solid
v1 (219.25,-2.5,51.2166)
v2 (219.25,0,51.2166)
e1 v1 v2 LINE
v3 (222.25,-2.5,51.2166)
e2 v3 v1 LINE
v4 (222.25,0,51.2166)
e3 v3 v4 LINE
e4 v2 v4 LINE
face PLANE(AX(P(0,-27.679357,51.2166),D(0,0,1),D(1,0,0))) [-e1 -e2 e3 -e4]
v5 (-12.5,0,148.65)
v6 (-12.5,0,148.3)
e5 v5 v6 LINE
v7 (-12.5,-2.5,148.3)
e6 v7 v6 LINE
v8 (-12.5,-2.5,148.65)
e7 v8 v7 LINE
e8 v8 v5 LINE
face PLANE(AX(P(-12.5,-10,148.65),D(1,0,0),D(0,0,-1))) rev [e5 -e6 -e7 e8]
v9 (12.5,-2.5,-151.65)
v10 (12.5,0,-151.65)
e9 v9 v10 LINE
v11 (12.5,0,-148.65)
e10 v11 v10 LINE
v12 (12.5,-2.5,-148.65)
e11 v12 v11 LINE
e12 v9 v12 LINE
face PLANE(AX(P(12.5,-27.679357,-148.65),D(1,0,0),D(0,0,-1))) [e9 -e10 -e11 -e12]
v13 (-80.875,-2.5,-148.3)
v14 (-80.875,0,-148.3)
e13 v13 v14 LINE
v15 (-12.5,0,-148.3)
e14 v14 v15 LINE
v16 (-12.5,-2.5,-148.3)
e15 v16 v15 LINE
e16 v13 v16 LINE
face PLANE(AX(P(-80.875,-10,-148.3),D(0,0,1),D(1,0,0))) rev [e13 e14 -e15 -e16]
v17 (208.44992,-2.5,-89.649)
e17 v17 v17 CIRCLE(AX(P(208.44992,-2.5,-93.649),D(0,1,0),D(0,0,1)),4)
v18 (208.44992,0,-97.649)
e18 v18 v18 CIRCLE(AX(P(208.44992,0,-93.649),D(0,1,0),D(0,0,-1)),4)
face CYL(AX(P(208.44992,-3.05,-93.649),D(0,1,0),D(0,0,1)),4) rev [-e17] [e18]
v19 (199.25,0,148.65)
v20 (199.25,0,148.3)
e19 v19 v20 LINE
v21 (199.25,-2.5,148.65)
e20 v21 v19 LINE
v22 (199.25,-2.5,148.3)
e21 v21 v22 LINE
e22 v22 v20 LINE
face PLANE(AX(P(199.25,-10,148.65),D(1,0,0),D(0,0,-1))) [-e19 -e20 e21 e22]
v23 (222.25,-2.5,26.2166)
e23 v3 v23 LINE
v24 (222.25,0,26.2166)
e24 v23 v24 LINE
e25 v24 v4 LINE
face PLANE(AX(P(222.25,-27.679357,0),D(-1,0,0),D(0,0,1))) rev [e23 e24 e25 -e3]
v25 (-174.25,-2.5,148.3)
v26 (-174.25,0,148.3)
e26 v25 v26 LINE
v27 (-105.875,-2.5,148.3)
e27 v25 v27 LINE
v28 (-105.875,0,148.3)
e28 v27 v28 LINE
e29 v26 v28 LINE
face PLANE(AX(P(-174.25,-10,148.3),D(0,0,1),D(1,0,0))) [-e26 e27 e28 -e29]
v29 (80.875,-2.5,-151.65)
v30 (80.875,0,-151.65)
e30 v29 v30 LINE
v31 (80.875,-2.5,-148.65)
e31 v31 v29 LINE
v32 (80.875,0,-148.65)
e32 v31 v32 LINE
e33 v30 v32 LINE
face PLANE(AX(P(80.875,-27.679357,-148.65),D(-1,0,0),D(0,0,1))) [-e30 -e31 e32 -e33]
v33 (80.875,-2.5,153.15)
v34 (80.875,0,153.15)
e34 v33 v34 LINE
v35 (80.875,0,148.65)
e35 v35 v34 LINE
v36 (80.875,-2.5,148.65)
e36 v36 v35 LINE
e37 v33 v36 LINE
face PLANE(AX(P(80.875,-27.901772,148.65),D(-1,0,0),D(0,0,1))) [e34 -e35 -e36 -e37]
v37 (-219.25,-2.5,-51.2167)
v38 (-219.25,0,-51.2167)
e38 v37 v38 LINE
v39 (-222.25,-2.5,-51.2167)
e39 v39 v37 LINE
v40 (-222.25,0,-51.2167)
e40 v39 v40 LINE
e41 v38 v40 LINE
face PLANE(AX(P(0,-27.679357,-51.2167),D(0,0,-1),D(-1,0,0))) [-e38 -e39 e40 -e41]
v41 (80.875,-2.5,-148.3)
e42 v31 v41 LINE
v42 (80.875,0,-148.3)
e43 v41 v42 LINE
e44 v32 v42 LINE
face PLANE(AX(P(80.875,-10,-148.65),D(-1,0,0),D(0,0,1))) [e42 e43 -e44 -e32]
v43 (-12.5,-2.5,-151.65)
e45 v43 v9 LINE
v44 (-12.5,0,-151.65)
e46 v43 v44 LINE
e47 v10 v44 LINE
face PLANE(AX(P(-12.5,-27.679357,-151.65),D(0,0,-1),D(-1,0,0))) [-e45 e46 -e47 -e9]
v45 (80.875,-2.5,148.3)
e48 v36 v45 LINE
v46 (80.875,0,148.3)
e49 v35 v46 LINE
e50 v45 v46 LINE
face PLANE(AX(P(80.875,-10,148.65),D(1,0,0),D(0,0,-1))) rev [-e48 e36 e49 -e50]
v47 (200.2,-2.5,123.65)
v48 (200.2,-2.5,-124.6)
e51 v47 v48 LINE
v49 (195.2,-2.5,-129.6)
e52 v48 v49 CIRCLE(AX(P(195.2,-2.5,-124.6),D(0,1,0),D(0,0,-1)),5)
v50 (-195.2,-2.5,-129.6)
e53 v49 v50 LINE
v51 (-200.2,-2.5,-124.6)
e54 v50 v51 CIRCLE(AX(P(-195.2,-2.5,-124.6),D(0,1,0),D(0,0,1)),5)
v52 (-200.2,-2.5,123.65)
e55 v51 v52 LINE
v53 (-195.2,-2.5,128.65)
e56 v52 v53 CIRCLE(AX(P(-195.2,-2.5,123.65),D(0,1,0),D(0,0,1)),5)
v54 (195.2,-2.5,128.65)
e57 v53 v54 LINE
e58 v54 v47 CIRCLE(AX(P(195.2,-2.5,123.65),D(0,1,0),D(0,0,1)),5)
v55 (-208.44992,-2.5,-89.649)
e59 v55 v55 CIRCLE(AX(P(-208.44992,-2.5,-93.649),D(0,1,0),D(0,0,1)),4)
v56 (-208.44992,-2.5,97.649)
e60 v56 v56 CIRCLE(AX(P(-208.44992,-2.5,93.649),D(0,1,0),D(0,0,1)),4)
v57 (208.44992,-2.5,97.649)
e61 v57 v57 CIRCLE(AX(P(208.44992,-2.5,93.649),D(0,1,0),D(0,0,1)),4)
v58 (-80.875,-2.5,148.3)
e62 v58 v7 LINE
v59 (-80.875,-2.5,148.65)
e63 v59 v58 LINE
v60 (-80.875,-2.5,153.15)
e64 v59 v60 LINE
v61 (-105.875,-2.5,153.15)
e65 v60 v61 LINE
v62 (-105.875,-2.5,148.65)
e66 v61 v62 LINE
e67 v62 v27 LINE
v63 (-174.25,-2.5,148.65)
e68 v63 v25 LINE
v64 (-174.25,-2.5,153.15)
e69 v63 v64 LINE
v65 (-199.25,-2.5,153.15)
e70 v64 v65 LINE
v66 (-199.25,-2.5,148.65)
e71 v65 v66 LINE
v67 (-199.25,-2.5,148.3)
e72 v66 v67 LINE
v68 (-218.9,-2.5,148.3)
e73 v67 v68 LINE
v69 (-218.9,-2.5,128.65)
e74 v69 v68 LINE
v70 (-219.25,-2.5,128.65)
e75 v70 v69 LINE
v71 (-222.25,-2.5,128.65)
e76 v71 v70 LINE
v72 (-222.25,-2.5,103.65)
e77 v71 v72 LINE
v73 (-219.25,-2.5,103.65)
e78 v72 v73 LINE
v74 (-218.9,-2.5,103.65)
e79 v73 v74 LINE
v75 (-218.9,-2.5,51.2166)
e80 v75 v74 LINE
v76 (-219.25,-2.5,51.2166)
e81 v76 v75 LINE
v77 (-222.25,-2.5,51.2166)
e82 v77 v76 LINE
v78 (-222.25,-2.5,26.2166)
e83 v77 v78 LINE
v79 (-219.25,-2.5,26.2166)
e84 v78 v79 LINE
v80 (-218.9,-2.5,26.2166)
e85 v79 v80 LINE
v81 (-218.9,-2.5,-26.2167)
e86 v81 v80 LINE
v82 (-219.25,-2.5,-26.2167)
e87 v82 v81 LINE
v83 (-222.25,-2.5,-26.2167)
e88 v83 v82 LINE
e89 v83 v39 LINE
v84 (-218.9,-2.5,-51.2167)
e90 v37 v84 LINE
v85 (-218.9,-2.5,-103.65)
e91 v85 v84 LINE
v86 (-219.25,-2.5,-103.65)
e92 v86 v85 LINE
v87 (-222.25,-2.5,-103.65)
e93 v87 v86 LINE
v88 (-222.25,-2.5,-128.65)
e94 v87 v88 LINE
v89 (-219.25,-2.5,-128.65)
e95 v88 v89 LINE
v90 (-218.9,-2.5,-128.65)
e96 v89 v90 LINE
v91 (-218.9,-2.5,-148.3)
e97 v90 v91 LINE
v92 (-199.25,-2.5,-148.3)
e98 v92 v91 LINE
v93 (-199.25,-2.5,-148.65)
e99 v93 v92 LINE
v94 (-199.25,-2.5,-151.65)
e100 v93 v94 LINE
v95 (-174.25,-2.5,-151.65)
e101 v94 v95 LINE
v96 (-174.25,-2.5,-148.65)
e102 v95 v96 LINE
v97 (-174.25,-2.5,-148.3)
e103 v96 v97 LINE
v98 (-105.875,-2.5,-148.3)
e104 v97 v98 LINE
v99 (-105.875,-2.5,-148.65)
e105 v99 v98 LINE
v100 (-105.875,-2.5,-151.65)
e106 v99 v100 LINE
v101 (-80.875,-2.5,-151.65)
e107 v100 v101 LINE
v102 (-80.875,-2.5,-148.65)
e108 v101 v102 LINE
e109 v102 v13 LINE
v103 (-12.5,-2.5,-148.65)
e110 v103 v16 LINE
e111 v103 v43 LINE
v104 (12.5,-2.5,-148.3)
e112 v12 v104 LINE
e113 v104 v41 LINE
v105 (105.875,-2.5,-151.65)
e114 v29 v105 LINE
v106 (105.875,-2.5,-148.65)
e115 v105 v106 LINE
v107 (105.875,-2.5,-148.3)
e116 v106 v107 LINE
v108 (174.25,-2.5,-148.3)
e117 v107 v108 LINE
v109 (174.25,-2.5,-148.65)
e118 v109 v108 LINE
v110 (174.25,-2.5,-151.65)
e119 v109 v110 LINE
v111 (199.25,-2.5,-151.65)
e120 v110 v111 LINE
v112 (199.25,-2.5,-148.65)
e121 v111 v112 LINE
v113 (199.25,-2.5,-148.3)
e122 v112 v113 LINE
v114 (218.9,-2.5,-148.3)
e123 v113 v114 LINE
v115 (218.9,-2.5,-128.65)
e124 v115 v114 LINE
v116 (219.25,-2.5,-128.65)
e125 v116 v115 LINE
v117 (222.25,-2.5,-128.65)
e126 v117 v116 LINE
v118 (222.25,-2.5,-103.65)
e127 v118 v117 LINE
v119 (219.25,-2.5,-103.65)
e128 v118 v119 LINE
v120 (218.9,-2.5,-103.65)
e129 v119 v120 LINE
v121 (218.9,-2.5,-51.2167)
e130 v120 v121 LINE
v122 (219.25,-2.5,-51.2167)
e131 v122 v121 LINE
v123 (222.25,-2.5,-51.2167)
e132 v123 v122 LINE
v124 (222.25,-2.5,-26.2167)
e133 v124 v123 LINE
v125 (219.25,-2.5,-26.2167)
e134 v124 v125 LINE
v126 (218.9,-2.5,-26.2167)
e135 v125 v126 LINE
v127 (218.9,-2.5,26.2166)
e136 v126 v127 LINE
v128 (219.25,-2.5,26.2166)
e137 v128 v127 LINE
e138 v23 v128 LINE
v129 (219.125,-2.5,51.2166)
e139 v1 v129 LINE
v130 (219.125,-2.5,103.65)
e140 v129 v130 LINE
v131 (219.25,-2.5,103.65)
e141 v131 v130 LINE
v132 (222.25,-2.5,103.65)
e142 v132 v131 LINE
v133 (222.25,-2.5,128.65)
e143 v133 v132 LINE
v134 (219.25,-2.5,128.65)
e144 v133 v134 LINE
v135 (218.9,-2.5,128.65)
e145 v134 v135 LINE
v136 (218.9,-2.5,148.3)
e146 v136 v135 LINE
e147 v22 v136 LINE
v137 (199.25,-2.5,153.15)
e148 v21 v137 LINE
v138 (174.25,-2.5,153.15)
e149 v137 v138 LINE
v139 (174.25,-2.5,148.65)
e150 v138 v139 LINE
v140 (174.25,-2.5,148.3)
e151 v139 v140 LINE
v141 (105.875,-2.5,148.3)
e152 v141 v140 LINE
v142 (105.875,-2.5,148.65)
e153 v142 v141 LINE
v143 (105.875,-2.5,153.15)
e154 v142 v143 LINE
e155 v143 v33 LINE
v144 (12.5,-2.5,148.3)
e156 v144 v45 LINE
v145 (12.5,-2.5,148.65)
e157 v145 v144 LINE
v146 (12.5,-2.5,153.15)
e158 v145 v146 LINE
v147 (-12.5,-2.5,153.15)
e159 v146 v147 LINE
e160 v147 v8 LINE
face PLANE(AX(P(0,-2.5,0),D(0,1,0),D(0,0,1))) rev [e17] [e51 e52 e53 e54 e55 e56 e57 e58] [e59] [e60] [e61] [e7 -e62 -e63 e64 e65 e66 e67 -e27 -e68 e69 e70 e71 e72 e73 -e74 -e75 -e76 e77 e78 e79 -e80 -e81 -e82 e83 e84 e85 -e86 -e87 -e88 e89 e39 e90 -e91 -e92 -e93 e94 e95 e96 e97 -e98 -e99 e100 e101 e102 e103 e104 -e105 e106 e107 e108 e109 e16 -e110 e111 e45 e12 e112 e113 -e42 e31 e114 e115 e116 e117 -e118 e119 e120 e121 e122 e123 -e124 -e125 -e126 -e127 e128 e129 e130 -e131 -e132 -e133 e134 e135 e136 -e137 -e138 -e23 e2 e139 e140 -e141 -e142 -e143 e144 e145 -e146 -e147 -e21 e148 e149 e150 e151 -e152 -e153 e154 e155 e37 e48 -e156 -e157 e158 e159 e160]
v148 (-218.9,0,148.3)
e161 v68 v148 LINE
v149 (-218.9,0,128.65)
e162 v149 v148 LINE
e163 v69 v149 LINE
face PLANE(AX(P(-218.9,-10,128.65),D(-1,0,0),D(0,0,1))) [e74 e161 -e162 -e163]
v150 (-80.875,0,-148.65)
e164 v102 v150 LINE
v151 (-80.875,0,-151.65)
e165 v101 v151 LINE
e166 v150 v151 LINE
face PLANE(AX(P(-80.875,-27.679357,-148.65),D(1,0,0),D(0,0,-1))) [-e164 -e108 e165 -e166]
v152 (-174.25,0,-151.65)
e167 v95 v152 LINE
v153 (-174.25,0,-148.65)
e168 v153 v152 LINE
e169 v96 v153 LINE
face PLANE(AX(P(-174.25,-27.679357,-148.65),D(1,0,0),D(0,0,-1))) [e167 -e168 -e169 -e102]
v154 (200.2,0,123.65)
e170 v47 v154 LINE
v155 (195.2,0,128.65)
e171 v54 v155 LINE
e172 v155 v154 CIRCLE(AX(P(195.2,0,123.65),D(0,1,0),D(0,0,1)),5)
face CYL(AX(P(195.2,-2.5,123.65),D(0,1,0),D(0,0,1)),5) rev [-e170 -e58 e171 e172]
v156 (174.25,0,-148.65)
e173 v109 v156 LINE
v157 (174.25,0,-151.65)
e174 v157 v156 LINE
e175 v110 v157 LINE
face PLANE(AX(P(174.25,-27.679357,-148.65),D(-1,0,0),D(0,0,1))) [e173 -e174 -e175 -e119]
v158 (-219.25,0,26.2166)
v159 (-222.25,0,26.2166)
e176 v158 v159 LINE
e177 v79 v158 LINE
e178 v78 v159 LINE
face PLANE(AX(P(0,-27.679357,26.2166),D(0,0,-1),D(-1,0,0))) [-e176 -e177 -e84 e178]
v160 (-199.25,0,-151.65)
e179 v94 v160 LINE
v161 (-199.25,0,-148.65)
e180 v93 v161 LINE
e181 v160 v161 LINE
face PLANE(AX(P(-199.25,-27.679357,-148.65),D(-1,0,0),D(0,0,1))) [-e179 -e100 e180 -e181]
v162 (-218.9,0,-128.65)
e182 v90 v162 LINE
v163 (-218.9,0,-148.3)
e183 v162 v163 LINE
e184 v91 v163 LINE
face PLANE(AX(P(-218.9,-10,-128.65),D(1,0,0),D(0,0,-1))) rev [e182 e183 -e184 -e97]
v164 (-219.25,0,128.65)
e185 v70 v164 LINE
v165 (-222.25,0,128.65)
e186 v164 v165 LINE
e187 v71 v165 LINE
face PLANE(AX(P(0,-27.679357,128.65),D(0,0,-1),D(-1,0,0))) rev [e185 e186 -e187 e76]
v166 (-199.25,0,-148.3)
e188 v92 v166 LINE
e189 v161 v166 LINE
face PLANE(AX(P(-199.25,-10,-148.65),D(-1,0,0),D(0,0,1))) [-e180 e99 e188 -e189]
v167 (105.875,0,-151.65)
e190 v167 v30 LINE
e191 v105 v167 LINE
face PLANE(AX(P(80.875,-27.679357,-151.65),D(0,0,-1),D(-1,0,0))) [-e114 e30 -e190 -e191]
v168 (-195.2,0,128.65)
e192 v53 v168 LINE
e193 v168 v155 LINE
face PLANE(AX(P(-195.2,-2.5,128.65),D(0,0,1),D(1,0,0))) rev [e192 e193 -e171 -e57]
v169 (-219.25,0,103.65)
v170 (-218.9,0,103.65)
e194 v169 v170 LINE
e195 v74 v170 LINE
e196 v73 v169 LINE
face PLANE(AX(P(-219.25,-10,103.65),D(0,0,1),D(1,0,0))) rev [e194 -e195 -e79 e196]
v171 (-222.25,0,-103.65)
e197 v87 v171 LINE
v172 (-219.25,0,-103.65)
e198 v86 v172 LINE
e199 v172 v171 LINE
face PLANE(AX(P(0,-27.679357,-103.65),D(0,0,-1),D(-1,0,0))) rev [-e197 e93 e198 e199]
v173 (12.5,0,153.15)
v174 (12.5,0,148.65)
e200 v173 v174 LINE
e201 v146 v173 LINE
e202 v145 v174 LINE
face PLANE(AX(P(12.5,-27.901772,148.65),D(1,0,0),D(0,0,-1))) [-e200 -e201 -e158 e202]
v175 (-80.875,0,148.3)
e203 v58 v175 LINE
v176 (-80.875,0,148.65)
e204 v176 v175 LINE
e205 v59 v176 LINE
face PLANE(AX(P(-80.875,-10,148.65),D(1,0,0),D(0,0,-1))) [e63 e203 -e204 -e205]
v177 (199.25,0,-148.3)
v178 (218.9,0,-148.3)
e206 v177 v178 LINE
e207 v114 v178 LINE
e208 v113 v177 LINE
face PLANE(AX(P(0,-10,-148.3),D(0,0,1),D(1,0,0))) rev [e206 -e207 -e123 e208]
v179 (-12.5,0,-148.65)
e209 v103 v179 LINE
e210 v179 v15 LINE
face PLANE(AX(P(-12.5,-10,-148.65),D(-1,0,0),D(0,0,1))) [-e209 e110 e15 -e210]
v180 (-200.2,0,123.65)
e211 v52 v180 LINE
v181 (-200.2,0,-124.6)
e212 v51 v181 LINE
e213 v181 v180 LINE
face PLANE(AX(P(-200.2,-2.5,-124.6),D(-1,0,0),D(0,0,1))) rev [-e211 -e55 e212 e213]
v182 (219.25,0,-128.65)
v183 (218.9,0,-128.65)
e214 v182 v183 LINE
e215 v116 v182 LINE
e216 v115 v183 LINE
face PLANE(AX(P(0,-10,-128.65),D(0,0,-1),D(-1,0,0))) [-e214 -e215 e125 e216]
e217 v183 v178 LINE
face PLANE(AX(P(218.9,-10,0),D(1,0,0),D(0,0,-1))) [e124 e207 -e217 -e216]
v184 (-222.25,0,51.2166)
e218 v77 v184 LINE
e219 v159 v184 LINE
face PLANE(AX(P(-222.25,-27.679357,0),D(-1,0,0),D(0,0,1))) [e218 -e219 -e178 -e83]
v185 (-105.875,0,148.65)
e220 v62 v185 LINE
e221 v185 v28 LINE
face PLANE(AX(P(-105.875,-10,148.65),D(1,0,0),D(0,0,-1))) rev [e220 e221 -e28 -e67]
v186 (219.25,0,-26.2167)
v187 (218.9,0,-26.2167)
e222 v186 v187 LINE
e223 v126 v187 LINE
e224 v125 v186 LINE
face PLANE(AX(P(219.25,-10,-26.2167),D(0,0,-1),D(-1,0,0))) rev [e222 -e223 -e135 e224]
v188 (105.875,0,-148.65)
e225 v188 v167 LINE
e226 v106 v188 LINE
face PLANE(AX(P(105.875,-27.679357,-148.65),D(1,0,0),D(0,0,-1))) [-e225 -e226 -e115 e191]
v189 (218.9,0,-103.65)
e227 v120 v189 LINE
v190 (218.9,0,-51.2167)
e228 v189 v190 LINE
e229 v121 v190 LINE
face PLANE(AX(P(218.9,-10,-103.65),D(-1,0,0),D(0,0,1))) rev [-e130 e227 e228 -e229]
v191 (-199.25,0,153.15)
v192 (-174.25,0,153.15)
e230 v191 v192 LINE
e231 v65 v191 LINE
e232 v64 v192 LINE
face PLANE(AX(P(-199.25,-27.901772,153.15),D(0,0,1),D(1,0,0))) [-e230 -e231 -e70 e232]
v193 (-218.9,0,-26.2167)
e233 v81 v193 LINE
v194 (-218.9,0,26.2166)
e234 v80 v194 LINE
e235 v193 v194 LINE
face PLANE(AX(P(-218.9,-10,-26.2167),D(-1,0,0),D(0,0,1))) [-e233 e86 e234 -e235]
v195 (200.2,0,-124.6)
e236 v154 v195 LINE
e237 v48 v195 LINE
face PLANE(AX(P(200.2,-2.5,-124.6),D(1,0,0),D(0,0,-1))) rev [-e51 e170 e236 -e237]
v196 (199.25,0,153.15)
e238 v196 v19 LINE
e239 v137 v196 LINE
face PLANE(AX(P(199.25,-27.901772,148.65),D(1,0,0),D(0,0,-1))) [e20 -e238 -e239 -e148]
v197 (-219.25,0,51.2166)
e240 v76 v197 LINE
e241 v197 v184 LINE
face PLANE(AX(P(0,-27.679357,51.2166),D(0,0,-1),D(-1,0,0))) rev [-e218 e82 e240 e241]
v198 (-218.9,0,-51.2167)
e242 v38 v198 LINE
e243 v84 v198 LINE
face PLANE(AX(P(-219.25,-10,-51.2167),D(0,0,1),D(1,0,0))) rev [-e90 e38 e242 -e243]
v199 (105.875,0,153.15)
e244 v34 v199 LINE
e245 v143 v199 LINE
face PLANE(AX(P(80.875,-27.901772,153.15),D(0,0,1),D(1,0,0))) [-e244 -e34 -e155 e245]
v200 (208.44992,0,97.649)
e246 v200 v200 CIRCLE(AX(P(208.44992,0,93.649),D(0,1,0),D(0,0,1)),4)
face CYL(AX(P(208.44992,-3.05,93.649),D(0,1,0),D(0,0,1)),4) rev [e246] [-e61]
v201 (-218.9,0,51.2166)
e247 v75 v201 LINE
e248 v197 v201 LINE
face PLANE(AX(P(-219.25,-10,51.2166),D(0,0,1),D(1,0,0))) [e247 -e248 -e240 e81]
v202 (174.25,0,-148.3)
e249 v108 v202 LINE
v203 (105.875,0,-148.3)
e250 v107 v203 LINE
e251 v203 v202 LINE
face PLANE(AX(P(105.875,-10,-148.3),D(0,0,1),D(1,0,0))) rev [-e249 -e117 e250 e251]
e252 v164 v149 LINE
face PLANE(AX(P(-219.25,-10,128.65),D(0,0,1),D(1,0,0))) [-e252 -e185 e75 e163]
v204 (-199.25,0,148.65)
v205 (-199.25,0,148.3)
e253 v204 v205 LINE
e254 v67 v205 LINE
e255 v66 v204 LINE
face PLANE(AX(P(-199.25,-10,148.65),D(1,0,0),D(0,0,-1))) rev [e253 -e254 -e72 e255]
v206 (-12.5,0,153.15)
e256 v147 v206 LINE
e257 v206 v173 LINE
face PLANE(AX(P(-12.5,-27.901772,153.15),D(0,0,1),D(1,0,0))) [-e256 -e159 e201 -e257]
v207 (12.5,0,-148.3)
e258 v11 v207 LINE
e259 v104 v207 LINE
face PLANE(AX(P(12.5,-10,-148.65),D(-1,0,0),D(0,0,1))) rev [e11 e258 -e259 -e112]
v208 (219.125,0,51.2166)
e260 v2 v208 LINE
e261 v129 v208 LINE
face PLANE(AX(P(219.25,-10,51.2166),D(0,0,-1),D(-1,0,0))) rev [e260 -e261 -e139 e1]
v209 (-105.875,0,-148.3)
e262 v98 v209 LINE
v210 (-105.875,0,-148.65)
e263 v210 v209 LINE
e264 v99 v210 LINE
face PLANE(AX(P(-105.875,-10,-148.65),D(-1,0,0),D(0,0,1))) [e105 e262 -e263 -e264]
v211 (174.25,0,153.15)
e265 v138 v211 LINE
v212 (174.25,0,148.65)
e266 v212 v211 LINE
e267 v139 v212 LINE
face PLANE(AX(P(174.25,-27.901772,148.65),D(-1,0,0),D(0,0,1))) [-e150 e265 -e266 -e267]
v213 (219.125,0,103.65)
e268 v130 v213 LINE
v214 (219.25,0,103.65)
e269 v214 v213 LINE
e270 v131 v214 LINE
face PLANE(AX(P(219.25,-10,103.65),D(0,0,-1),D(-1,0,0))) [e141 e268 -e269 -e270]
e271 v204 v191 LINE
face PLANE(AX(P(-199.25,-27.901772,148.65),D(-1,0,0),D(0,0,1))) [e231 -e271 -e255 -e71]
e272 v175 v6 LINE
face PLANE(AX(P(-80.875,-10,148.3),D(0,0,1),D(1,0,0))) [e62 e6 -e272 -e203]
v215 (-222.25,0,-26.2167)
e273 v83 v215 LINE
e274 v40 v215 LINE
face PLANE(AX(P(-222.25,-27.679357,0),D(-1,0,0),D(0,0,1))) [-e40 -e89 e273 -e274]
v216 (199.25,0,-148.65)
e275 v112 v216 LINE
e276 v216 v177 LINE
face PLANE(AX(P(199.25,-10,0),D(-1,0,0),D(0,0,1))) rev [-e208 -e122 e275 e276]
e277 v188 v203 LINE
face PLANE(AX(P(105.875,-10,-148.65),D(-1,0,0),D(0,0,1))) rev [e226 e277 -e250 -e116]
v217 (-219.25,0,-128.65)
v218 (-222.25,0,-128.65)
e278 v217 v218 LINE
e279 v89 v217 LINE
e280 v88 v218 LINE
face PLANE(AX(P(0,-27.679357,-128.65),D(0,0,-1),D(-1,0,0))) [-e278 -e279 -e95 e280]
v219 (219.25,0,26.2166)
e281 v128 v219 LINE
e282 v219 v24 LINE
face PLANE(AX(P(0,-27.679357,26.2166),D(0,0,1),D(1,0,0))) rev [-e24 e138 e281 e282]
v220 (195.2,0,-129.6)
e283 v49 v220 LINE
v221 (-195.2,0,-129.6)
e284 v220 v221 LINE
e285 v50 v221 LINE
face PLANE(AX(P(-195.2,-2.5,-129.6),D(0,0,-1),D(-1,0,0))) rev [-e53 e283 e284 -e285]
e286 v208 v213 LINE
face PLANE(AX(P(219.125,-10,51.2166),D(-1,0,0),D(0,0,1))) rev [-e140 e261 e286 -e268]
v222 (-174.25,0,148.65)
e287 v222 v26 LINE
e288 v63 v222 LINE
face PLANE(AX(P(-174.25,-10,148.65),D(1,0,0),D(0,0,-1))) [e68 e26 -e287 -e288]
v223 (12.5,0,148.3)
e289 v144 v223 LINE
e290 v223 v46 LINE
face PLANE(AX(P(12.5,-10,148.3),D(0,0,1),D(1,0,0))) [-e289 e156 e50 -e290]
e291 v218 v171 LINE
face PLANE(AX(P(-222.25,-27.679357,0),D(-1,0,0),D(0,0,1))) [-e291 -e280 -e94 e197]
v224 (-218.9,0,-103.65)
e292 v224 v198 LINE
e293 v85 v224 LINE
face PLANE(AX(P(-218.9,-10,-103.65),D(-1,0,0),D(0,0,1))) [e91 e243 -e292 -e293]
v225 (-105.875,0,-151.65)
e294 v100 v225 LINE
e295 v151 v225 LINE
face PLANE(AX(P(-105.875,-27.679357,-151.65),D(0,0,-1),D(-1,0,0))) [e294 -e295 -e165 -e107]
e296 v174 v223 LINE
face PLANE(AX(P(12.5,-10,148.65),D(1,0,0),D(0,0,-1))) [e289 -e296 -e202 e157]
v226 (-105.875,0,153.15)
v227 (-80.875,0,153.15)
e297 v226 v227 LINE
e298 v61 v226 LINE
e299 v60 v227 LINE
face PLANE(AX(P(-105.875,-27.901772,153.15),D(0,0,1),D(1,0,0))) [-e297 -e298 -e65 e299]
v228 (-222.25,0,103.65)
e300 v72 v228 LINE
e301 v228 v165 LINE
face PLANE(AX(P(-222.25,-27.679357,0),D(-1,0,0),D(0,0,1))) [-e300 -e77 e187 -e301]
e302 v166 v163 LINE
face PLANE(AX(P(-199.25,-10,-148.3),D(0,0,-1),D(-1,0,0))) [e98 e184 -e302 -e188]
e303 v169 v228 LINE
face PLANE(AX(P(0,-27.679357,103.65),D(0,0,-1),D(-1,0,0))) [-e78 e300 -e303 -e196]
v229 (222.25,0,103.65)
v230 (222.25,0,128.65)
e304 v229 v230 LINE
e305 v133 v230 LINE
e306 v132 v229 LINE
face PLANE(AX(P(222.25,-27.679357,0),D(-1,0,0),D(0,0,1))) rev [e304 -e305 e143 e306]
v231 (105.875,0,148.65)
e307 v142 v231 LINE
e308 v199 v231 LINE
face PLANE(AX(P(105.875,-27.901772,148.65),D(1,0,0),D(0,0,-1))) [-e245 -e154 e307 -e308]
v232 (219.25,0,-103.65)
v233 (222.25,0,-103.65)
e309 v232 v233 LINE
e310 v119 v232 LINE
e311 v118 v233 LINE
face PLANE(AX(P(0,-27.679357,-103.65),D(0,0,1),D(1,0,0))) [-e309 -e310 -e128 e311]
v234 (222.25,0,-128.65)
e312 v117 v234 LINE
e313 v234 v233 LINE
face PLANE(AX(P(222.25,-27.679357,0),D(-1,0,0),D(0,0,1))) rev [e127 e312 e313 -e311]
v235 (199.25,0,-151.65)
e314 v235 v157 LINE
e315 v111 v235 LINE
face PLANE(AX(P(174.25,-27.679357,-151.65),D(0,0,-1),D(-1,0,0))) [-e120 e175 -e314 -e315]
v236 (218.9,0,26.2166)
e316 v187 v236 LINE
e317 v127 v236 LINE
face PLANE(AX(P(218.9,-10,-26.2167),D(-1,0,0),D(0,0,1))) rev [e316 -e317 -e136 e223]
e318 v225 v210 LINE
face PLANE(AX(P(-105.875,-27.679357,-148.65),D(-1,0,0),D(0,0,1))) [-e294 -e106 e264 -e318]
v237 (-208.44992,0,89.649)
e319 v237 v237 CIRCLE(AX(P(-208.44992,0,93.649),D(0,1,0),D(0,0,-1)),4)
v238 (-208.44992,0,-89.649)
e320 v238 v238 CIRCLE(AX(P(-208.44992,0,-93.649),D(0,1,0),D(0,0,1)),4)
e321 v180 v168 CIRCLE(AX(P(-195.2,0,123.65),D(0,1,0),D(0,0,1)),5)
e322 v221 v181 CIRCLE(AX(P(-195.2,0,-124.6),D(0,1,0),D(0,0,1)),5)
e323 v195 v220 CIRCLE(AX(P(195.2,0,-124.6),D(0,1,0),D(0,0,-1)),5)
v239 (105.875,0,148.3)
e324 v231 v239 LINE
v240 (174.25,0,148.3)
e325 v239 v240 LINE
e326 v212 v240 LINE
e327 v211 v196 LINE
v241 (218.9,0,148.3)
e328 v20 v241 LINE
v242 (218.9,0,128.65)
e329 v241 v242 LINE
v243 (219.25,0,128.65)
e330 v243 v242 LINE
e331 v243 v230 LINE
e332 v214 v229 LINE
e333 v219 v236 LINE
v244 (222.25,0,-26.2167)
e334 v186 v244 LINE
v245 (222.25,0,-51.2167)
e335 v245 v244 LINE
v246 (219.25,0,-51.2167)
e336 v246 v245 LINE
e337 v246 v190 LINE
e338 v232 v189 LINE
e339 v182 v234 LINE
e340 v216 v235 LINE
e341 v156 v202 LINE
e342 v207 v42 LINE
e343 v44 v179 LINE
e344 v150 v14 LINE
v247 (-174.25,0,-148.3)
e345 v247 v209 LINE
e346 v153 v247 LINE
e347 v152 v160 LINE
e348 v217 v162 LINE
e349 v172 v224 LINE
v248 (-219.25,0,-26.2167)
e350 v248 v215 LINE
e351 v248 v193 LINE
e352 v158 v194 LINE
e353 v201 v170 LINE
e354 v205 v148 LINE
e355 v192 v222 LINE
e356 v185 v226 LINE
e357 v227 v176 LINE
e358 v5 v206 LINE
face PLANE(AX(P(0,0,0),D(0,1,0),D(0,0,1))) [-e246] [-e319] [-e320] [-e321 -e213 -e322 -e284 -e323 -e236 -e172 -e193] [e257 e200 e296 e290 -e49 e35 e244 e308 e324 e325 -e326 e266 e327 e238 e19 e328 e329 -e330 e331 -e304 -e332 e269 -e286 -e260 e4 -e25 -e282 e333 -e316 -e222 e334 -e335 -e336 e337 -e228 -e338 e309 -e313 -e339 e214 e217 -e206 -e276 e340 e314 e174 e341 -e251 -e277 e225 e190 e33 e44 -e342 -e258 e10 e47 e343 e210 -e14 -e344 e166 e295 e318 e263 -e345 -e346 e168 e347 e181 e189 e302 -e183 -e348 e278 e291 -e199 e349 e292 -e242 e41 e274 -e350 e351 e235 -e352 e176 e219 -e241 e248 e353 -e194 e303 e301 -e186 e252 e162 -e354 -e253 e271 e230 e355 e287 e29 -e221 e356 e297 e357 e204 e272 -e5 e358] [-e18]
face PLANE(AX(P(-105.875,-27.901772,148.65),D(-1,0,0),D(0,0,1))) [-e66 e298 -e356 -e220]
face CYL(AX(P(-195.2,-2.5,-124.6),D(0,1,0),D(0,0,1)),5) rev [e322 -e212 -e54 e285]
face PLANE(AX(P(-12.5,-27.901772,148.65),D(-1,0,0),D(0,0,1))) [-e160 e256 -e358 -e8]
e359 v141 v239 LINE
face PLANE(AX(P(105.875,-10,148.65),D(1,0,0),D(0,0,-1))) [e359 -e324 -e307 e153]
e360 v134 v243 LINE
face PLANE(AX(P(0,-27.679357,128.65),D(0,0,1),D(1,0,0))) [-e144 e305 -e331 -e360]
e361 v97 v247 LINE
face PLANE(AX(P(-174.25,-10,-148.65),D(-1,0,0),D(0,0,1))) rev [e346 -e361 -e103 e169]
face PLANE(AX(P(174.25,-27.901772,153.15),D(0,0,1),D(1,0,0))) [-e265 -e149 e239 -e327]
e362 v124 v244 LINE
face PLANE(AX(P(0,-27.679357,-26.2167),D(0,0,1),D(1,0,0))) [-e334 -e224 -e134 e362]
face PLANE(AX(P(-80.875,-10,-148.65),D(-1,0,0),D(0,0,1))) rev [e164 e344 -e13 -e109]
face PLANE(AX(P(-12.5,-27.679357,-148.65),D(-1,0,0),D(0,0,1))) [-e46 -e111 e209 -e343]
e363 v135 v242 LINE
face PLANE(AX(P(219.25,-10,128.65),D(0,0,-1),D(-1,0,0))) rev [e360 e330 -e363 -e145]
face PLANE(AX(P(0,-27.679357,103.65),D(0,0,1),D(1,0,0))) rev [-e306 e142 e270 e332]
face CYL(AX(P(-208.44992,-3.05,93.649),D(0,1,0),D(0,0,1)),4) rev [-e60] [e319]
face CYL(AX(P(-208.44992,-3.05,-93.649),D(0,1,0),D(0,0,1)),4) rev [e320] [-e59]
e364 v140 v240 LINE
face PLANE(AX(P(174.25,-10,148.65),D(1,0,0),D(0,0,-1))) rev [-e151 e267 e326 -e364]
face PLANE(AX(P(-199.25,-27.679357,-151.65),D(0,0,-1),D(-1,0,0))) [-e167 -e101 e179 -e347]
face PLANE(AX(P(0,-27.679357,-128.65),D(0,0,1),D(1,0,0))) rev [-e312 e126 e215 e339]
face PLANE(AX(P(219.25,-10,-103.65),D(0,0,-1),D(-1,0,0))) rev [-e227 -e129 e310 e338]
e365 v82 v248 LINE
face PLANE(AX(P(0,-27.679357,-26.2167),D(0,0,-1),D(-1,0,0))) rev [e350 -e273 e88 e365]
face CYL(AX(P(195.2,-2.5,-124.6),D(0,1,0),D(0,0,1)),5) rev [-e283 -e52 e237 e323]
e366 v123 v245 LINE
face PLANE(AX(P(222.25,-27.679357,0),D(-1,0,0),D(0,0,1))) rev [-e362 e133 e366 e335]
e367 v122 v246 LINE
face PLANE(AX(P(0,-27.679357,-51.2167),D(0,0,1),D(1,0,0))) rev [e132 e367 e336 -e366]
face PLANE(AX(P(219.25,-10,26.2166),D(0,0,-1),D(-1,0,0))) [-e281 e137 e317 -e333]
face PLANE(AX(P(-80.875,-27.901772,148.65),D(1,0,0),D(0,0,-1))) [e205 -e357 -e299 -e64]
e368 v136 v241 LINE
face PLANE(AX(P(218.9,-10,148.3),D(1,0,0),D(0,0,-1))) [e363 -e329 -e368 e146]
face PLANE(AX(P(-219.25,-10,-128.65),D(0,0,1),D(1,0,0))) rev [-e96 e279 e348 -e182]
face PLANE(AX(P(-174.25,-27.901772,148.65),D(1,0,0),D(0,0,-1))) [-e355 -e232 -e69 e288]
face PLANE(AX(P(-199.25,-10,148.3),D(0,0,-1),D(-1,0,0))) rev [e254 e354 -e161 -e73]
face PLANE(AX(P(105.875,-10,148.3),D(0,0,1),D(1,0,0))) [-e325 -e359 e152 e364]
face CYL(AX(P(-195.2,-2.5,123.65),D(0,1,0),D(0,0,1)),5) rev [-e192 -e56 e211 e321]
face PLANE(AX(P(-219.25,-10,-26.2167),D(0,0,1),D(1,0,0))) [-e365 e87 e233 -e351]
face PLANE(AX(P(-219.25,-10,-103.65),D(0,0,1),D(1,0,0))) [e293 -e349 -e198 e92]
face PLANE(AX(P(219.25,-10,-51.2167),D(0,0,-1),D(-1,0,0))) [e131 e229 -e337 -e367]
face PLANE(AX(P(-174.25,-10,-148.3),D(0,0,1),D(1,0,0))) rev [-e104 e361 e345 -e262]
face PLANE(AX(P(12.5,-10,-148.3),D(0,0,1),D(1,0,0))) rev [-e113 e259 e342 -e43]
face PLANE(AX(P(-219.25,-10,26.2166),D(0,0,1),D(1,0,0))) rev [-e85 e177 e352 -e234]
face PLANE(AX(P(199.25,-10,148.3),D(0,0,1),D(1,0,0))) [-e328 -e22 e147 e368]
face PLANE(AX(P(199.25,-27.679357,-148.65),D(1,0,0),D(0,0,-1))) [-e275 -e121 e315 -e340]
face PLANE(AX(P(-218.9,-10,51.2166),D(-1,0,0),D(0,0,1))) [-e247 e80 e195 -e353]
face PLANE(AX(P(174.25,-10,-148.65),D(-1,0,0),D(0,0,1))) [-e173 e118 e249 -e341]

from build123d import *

# Parameters (mm, degrees)
SKETCH1_W           = 438.5
SKETCH1_H           = 297.3
BASE_FLANGE1_DEPTH  = 2.5
SKETCH6_W           = 3
SKETCH6_H           = 25
BOSS_EXTRUDE1_DEPTH = 2.5
SKETCH8_W           = 25
SKETCH8_H           = 4.5
BOSS_EXTRUDE2_DEPTH = 2.5
SKETCH9_W           = 25
SKETCH9_H           = 3
BOSS_EXTRUDE3_DEPTH = 2.5
SKETCH10_W          = 0.35
SKETCH10_H          = 19.65
SKETCH10_W_2        = 20
SKETCH10_H_2        = 0.35
SKETCH10_H_3        = 52.4334
SKETCH10_H_4        = 20
SKETCH10_W_3        = 19.65
SKETCH10_W_4        = 68.375
SKETCH10_W_5        = 0.125
SKETCH10_H_5        = 52.4333
CUT_EXTRUDE1_DEPTH  = 10
SKETCH11_R          = 4
CUT_EXTRUDE2_DEPTH  = 3.05


# Sheet-metal steps are written as plain solids
with BuildPart() as part:
    # Sketch1 → Base-Flange1 (new body)
    with BuildSketch(Plane(origin=(0, 0, 0), x_dir=(1, 0, 0), z_dir=(0, 1, 0))):
        Rectangle(SKETCH1_W, SKETCH1_H)
        with BuildLine():
            Line((-195.2, 129.6), (195.2, 129.6))
            ThreePointArc((195.2, 129.6), (198.735533906, 128.135533906), (200.2, 124.6))
            Line((200.2, 124.6), (200.2, -123.65))
            ThreePointArc((200.2, -123.65), (198.735533906, -127.185533906), (195.2, -128.65))
            Line((195.2, -128.65), (-195.2, -128.65))
            ThreePointArc((-195.2, -128.65), (-198.735533906, -127.185533906), (-200.2, -123.65))
            Line((-200.2, -123.65), (-200.2, 124.6))
            ThreePointArc((-200.2, 124.6), (-198.735533906, 128.135533906), (-195.2, 129.6))
        make_face(mode=Mode.SUBTRACT)
    extrude(amount=-BASE_FLANGE1_DEPTH)

    # Sketch6 → Boss-Extrude1 (add)
    with BuildSketch(Plane(origin=(0, 0, 0), x_dir=(1, 0, 0), z_dir=(0, 1, 0))):
        with Locations((220.75, -116.15)):
            Rectangle(SKETCH6_W, SKETCH6_H)
        with Locations((220.75, -38.7166)):
            Rectangle(SKETCH6_W, SKETCH6_H)
        with Locations((220.75, 38.7167)):
            Rectangle(SKETCH6_W, SKETCH6_H)
        with Locations((220.75, 116.15)):
            Rectangle(SKETCH6_W, SKETCH6_H)
    boss_extrude1 = extrude(amount=-BOSS_EXTRUDE1_DEPTH)

    # Mirror1: Boss-Extrude1 across plane
    add(boss_extrude1.mirror(Plane(origin=(0, 0, 0), x_dir=(0, 0, 1), z_dir=(1, 0, 0))))

    # Sketch8 → Boss-Extrude2 (add)
    with BuildSketch(Plane(origin=(0, 0, 0), x_dir=(1, 0, 0), z_dir=(0, 1, 0))):
        with Locations((-186.75, -150.9)):
            Rectangle(SKETCH8_W, SKETCH8_H)
        with Locations((93.375, -150.9)):
            Rectangle(SKETCH8_W, SKETCH8_H)
        with Locations((-93.375, -150.9)):
            Rectangle(SKETCH8_W, SKETCH8_H)
        with Locations((0, -150.9)):
            Rectangle(SKETCH8_W, SKETCH8_H)
        with Locations((186.75, -150.9)):
            Rectangle(SKETCH8_W, SKETCH8_H)
    extrude(amount=-BOSS_EXTRUDE2_DEPTH)

    # Sketch9 → Boss-Extrude3 (add)
    with BuildSketch(Plane(origin=(0, 0, 0), x_dir=(1, 0, 0), z_dir=(0, 1, 0))):
        with Locations((-186.75, 150.15)):
            Rectangle(SKETCH9_W, SKETCH9_H)
        with Locations((-93.375, 150.15)):
            Rectangle(SKETCH9_W, SKETCH9_H)
        with Locations((0, 150.15)):
            Rectangle(SKETCH9_W, SKETCH9_H)
        with Locations((93.375, 150.15)):
            Rectangle(SKETCH9_W, SKETCH9_H)
        with Locations((186.75, 150.15)):
            Rectangle(SKETCH9_W, SKETCH9_H)
    extrude(amount=-BOSS_EXTRUDE3_DEPTH)

    # Sketch10 → Cut-Extrude1 (cut)
    with BuildSketch(Plane(origin=(0, 0, 0), x_dir=(1, 0, 0), z_dir=(0, 1, 0))):
        with Locations((219.075, 138.475)):
            Rectangle(SKETCH10_W, SKETCH10_H)
        with Locations((209.25, 148.475)):
            Rectangle(SKETCH10_W_2, SKETCH10_H_2)
        with Locations((-219.075, -77.4333)):
            Rectangle(SKETCH10_W, SKETCH10_H_3)
        with Locations((-219.075, -138.65)):
            Rectangle(SKETCH10_W, SKETCH10_H_4)
        with Locations((-209.075, -148.475)):
            Rectangle(SKETCH10_W_3, SKETCH10_H_2)
        with Locations((-140.0625, -148.475)):
            Rectangle(SKETCH10_W_4, SKETCH10_H_2)
        with Locations((-46.6875, -148.475)):
            Rectangle(SKETCH10_W_4, SKETCH10_H_2)
        with Locations((46.6875, -148.475)):
            Rectangle(SKETCH10_W_4, SKETCH10_H_2)
        with Locations((140.0625, -148.475)):
            Rectangle(SKETCH10_W_4, SKETCH10_H_2)
        with Locations((209.25, -148.475)):
            Rectangle(SKETCH10_W_2, SKETCH10_H_2)
        with Locations((219.075, -138.475)):
            Rectangle(SKETCH10_W, SKETCH10_H)
        with Locations((219.1875, -77.4333)):
            Rectangle(SKETCH10_W_5, SKETCH10_H_3)
        with Locations((219.075, 5e-05)):
            Rectangle(SKETCH10_W, SKETCH10_H_5)
        with Locations((219.075, 77.43335)):
            Rectangle(SKETCH10_W, SKETCH10_H_5)
        with Locations((140.0625, 148.475)):
            Rectangle(SKETCH10_W_4, SKETCH10_H_2)
        with Locations((46.6875, 148.475)):
            Rectangle(SKETCH10_W_4, SKETCH10_H_2)
        with Locations((-46.6875, 148.475)):
            Rectangle(SKETCH10_W_4, SKETCH10_H_2)
        with Locations((-209.25, 148.475)):
            Rectangle(SKETCH10_W_2, SKETCH10_H_2)
        with Locations((-140.0625, 148.475)):
            Rectangle(SKETCH10_W_4, SKETCH10_H_2)
        with Locations((-219.075, 138.475)):
            Rectangle(SKETCH10_W, SKETCH10_H)
        with Locations((-219.075, 77.43335)):
            Rectangle(SKETCH10_W, SKETCH10_H_5)
        with Locations((-219.075, 5e-05)):
            Rectangle(SKETCH10_W, SKETCH10_H_5)
    extrude(amount=-CUT_EXTRUDE1_DEPTH, mode=Mode.SUBTRACT)

    # Sketch11 → Cut-Extrude2 (cut)
    with BuildSketch(Plane(origin=(0, 0, 0), x_dir=(1, 0, 0), z_dir=(0, 1, 0))):
        with Locations(Location((-208.44992, 93.649, 0), (0, 0, 270))):
            Circle(SKETCH11_R)
        with Locations(Location((208.44992, 93.649, 0), (0, 0, 270))):
            Circle(SKETCH11_R)
        with Locations(Location((208.44992, -93.649, 0), (0, 0, 270))):
            Circle(SKETCH11_R)
        with Locations(Location((-208.44992, -93.649, 0), (0, 0, 270))):
            Circle(SKETCH11_R)
    extrude(amount=-CUT_EXTRUDE2_DEPTH, mode=Mode.SUBTRACT)


solid = part.part
